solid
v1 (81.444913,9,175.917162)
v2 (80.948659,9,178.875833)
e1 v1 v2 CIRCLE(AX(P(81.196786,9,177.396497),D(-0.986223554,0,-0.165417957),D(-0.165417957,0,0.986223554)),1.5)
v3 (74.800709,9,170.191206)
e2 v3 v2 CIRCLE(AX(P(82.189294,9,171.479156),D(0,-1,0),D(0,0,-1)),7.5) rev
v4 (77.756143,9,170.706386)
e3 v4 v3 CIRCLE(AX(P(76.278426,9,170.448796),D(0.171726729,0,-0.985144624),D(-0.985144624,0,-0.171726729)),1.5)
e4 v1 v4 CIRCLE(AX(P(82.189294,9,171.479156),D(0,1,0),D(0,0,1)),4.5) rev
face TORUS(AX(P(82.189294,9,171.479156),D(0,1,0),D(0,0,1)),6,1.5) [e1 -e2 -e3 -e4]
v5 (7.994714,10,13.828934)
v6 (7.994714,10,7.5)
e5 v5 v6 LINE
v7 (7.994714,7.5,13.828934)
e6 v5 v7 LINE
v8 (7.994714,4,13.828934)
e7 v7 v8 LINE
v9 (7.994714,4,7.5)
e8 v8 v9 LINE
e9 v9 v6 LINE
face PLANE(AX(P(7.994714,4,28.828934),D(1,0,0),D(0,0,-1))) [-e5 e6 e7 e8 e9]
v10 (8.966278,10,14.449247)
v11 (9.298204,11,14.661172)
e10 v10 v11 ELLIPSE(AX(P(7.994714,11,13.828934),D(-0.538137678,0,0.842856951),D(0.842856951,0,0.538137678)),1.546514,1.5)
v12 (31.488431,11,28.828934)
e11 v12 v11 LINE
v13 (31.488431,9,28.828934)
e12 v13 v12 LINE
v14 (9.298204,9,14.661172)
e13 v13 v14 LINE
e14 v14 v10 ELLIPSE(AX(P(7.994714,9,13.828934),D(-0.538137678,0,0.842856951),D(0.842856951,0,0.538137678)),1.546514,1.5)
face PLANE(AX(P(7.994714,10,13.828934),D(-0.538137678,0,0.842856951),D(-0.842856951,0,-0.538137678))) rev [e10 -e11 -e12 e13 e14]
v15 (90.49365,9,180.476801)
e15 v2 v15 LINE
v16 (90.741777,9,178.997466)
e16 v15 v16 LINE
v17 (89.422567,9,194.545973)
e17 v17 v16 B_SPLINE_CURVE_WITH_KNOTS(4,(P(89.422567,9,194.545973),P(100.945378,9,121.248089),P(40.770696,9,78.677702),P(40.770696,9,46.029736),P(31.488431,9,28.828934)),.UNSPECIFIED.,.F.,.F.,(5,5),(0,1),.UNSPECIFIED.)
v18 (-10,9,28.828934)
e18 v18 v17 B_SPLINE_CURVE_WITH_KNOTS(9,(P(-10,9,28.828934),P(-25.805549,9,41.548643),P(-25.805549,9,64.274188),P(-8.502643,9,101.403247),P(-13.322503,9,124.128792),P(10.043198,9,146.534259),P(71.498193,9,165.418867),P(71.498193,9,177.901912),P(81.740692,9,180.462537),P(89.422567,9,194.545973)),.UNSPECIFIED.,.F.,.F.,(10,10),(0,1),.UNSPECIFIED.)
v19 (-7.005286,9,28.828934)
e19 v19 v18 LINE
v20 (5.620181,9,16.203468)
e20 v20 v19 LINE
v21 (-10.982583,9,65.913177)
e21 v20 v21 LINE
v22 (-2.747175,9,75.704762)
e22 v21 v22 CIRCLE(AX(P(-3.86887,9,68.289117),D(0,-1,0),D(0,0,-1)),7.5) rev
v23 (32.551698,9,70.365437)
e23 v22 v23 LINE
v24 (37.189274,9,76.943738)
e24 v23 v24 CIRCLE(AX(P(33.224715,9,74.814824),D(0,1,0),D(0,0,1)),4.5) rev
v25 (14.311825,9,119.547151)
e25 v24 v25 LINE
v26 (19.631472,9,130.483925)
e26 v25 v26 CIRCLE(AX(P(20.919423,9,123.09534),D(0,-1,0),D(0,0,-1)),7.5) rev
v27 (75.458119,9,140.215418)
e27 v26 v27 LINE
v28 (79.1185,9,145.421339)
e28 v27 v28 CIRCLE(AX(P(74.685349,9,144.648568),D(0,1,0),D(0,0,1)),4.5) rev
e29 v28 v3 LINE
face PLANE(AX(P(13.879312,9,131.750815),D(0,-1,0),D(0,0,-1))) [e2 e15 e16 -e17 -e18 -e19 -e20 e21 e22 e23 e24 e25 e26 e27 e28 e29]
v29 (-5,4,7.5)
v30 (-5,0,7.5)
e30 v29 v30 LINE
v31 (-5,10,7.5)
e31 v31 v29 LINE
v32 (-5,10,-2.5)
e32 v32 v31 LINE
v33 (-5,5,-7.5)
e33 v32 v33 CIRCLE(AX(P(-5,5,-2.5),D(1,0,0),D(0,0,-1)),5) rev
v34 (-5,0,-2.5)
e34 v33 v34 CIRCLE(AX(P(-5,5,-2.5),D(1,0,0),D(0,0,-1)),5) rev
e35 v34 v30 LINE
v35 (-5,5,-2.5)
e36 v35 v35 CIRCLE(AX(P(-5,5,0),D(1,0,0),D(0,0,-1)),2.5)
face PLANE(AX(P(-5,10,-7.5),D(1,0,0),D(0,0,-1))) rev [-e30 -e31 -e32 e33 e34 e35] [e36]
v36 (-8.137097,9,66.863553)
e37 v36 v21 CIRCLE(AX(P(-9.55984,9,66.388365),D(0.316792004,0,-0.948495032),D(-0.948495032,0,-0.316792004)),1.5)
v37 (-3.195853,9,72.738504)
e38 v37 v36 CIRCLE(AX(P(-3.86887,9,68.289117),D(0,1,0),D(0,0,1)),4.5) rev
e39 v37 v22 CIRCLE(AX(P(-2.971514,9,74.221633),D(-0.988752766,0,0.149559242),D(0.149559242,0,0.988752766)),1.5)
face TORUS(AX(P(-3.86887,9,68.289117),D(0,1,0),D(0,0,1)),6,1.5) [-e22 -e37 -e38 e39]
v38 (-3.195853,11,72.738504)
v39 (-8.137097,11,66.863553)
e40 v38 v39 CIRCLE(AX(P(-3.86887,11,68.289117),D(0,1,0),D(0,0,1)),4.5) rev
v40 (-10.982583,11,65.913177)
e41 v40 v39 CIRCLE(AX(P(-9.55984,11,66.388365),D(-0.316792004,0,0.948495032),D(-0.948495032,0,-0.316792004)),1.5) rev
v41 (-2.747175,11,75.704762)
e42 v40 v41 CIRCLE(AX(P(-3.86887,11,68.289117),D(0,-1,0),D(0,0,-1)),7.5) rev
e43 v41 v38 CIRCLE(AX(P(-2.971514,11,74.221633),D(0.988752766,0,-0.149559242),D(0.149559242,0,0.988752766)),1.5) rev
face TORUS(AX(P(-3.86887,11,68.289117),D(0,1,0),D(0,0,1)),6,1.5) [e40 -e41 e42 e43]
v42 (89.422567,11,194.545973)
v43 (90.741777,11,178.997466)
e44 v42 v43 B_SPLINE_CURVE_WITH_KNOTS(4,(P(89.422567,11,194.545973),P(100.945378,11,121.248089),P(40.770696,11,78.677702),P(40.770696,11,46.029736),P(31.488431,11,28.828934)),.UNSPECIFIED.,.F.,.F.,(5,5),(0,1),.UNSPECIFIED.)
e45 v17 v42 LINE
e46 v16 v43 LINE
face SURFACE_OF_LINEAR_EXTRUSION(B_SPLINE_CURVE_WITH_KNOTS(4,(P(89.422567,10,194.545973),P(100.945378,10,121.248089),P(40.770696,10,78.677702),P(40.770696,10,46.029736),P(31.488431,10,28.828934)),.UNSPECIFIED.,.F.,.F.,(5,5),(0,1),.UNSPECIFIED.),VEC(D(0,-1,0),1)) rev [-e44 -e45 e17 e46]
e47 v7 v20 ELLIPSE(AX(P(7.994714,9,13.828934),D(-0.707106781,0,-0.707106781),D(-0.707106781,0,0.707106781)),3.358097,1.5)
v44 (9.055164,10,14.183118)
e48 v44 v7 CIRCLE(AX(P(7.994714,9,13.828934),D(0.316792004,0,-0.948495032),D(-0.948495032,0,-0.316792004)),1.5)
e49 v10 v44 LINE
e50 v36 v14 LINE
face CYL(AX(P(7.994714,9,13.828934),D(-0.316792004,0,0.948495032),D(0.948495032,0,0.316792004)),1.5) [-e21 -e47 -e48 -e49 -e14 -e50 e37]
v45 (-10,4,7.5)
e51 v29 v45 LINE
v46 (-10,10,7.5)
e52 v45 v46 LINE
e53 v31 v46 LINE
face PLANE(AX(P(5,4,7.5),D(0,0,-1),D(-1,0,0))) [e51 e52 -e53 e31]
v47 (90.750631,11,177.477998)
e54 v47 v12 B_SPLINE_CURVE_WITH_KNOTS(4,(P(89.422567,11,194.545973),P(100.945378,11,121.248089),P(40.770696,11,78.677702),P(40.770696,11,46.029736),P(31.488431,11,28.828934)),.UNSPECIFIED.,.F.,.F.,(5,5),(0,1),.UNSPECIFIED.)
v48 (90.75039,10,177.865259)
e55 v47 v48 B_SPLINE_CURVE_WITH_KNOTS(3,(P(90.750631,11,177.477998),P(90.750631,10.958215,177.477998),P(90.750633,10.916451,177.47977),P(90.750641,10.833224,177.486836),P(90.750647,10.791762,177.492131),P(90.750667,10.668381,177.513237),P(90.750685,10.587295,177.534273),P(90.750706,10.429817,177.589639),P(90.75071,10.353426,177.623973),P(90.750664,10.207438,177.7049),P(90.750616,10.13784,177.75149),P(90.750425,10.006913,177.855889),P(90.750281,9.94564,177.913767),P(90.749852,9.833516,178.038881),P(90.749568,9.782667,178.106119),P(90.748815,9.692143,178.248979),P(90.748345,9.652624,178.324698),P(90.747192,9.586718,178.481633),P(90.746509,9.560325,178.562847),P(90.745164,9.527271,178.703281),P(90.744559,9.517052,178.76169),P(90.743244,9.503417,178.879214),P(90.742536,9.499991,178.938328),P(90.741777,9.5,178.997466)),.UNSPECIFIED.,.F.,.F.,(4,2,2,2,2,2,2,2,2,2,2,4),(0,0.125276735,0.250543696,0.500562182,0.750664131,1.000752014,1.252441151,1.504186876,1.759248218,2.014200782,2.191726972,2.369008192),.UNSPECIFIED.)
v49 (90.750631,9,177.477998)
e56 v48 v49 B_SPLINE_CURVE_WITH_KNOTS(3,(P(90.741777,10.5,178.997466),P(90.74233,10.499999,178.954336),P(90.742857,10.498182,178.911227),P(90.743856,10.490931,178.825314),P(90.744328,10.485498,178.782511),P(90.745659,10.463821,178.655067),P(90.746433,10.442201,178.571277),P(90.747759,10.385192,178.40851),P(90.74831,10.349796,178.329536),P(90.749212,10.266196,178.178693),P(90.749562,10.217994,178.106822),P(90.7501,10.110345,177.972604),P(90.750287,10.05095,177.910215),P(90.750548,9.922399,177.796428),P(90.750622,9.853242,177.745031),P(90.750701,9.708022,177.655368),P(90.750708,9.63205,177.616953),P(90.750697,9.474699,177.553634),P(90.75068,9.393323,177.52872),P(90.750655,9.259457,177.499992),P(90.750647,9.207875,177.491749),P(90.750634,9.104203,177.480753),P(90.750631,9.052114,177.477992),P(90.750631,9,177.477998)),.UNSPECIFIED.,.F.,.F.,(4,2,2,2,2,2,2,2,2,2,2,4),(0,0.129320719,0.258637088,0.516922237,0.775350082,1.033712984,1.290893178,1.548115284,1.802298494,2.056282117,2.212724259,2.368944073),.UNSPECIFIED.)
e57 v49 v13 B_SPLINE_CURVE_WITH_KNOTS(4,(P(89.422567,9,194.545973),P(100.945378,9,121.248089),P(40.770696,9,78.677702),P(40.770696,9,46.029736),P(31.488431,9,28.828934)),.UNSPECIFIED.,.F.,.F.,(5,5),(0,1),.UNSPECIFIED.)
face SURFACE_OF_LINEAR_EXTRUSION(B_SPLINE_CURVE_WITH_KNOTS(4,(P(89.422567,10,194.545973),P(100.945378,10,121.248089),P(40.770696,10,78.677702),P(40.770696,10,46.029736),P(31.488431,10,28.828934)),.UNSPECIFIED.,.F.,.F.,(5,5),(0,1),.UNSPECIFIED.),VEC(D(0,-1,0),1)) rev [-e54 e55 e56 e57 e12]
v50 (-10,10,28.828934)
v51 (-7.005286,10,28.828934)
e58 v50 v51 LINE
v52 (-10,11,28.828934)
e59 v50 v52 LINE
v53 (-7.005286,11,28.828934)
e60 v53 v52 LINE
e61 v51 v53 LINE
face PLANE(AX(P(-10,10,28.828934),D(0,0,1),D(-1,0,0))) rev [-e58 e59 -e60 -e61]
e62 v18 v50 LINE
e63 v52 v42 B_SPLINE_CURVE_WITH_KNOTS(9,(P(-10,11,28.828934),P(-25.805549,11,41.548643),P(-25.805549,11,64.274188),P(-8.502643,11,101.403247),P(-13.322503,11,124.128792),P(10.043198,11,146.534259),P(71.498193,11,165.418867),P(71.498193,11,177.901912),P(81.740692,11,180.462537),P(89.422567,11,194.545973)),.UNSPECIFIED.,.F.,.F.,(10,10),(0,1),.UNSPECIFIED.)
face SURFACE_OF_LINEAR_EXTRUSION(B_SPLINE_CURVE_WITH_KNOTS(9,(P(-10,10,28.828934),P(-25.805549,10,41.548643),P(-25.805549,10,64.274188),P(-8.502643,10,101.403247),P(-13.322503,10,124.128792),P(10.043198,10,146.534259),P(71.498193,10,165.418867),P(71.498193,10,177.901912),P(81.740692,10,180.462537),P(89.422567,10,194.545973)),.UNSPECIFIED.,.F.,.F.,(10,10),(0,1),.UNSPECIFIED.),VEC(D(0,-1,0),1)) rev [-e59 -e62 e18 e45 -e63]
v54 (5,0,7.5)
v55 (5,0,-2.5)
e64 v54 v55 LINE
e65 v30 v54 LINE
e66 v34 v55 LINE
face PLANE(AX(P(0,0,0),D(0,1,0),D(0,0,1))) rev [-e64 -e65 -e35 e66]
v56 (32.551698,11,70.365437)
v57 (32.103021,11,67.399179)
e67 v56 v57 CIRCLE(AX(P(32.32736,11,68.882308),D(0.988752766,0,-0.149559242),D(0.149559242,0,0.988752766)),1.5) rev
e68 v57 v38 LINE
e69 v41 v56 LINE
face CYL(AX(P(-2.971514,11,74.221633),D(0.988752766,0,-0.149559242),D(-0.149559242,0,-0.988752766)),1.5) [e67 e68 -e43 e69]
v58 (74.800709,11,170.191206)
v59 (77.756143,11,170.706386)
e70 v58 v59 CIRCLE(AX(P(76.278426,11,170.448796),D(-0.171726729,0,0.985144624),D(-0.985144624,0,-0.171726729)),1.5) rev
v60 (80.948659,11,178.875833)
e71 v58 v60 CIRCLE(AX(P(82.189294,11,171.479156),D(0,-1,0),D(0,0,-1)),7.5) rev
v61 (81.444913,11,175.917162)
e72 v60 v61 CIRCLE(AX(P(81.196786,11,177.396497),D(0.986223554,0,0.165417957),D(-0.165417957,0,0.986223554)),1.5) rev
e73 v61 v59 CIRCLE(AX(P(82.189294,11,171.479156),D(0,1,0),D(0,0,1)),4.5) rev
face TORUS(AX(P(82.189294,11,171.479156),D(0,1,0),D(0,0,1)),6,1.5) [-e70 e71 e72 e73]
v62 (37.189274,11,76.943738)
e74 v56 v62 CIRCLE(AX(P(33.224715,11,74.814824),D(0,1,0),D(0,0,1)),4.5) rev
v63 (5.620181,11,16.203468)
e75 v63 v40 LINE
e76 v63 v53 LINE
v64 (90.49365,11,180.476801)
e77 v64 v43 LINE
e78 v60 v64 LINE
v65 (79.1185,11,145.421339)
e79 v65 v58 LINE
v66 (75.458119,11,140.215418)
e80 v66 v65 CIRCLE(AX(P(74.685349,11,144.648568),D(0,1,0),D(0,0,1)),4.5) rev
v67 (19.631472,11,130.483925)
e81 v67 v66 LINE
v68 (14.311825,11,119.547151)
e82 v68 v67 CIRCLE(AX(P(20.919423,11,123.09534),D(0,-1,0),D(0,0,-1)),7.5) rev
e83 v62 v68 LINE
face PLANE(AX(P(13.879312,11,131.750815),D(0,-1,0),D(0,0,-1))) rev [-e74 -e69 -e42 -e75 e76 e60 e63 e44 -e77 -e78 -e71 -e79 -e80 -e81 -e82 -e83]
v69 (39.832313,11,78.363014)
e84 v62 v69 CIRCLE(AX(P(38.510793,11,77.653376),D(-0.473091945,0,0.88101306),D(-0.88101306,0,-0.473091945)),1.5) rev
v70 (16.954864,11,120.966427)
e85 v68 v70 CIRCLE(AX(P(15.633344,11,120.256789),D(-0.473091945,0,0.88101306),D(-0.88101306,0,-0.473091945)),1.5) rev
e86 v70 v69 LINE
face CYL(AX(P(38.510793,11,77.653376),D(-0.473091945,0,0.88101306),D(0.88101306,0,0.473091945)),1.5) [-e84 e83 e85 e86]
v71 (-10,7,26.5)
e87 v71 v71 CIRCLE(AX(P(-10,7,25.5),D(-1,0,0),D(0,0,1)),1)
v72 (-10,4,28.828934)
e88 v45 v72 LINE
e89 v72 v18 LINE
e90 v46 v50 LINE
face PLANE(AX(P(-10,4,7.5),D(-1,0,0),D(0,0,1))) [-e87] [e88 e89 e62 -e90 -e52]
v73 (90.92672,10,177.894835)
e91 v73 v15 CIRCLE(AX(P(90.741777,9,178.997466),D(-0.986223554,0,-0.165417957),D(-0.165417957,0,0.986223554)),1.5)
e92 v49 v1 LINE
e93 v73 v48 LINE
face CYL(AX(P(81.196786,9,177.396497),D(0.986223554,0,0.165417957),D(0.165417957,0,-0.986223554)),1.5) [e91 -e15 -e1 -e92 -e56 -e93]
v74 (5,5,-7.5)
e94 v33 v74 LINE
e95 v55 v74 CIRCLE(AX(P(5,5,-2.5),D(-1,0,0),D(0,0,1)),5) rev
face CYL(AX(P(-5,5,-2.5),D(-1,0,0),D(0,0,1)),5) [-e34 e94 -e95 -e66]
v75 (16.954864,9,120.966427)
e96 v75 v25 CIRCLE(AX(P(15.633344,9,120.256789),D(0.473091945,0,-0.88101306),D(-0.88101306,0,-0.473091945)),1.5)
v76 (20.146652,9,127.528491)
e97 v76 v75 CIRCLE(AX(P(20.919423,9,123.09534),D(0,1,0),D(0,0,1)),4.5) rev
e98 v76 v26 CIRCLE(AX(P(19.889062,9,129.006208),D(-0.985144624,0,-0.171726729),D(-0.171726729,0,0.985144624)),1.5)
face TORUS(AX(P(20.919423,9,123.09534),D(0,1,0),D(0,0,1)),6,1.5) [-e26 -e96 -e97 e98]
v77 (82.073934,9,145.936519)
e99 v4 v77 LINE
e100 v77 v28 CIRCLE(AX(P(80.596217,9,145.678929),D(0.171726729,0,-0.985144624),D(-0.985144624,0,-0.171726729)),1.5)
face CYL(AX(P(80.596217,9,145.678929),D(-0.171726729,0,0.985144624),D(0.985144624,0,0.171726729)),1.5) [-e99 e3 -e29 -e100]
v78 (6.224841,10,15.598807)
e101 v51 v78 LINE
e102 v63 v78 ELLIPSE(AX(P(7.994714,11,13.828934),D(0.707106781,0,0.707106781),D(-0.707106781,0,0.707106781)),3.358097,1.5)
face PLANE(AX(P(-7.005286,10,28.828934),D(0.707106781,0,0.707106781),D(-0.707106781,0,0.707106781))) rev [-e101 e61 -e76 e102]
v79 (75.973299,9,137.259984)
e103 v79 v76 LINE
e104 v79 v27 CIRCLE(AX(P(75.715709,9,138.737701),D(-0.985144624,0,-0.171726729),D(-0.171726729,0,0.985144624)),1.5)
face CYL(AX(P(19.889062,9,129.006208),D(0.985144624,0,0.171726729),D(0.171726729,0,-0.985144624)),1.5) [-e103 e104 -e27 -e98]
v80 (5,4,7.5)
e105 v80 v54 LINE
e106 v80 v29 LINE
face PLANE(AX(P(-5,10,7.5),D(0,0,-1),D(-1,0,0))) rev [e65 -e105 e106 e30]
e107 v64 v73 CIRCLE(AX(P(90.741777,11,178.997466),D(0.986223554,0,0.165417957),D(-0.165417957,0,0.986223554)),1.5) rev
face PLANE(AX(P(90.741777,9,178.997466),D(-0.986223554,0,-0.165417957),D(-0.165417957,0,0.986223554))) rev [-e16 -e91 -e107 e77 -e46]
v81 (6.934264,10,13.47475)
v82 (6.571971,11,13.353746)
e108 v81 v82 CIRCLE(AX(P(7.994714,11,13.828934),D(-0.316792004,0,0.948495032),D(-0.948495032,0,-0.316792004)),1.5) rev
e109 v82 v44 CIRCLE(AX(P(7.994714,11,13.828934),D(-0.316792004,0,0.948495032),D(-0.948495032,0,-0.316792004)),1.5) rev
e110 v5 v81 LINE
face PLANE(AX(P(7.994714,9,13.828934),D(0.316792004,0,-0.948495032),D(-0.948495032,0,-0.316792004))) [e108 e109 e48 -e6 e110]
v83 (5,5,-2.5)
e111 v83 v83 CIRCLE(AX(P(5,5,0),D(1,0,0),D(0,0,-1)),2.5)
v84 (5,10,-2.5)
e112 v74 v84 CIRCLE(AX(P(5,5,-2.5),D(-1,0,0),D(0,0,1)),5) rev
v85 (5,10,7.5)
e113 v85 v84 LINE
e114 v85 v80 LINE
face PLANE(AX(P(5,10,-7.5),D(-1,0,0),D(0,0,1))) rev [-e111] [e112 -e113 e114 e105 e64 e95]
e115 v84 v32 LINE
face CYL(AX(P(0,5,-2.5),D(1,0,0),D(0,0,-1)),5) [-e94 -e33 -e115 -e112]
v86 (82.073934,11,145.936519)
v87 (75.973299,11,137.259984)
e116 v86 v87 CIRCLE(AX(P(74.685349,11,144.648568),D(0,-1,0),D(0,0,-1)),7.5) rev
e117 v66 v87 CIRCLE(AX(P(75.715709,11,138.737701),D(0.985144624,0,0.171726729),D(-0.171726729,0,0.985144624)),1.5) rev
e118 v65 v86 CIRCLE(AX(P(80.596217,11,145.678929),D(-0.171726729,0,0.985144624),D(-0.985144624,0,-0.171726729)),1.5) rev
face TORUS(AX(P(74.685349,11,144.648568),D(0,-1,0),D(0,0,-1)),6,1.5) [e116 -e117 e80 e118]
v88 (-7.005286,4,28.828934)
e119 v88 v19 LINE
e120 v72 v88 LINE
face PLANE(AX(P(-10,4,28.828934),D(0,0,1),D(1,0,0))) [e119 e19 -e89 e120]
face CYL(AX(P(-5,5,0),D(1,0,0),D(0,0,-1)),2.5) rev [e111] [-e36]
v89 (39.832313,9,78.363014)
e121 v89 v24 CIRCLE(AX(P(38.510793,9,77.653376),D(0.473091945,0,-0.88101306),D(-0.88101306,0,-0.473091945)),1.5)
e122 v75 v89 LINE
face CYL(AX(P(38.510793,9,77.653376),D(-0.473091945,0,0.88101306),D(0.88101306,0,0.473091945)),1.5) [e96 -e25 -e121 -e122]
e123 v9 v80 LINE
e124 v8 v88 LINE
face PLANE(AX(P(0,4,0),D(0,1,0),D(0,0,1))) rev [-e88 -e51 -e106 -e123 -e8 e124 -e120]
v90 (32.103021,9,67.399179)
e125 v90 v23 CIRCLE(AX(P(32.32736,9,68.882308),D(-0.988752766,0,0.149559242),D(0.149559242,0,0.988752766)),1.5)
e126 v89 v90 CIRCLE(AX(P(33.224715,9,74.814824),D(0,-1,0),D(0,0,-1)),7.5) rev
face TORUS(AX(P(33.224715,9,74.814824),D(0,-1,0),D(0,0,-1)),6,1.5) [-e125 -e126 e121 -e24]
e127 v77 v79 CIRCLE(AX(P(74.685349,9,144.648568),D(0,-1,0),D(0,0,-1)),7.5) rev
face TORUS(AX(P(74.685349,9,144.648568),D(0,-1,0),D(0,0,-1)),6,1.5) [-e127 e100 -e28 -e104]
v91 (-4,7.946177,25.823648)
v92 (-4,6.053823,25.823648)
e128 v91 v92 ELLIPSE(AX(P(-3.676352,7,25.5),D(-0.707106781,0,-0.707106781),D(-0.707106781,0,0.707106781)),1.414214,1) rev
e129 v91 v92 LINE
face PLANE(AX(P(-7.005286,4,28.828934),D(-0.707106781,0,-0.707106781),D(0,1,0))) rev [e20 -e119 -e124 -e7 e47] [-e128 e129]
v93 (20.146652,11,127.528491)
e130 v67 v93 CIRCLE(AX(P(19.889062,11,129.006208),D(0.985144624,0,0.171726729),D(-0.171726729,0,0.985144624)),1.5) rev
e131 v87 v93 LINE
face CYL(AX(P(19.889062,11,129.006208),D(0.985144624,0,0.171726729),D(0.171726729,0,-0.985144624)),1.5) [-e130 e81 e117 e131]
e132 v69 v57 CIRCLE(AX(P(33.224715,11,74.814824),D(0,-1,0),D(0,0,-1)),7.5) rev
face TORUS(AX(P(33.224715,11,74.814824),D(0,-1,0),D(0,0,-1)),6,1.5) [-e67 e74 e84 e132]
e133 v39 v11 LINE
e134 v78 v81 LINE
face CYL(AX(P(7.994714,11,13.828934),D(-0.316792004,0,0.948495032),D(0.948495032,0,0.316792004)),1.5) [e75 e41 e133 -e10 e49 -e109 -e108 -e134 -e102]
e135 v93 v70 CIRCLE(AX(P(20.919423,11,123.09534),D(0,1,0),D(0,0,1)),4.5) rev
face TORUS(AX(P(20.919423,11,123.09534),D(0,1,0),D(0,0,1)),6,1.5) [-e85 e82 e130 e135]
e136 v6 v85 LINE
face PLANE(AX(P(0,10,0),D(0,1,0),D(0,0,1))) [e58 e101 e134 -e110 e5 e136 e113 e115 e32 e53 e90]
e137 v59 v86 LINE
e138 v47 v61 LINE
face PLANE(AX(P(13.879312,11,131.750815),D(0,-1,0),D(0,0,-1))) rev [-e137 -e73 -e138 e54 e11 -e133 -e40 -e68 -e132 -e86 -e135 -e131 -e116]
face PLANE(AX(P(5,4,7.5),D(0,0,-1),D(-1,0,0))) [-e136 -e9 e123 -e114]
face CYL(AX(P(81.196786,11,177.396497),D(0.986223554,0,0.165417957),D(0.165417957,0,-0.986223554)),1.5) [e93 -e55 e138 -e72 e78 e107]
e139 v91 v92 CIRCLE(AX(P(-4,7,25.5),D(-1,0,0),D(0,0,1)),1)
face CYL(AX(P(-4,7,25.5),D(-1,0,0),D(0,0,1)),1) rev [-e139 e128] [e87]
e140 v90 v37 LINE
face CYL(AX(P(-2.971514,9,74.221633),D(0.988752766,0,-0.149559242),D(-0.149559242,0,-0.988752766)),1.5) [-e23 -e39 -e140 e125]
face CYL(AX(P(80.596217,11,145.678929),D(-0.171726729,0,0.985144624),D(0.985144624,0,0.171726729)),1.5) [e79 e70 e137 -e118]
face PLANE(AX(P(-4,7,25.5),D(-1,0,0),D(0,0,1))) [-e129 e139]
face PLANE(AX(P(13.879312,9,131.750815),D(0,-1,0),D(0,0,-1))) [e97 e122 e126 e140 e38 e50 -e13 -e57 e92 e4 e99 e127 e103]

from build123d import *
from build123d.topology import SkipClean

# Parameters (mm, degrees)
SKETCH1_W           = 10
SKETCH1_H           = 15
BOSS_EXTRUDE1_DEPTH = 10
SKETCH2_R           = 2.5
CUT_EXTRUDE1_DEPTH  = 10
FILLET1_R           = 5
BOSS_EXTRUDE2_DEPTH = 6
CHAMFER1_SIZE       = 15
THICKEN2_START      = 9
THICKEN2_DEPTH      = 2
SWEEP1_PROFILE_R    = 1.5
SKETCH30_R          = 1
CUT_EXTRUDE2_DEPTH  = 6


# Read off the part's stored shape, not the designer's step: Thicken2
with BuildPart() as part:
    # Sketch1 → Boss-Extrude1 (new body)
    with BuildSketch(Plane(origin=(0, 0, 0), x_dir=(1, 0, 0), z_dir=(0, 1, 0))):
        Rectangle(SKETCH1_W, SKETCH1_H)
    extrude(amount=BOSS_EXTRUDE1_DEPTH)

    # Sketch2 → Cut-Extrude1 (cut)
    with BuildSketch(Plane(origin=(5, 0, 0), x_dir=(0, 0, -1), z_dir=(1, 0, 0))):
        with Locations((0, 5)):
            Circle(SKETCH2_R)
    extrude(amount=-CUT_EXTRUDE1_DEPTH, mode=Mode.SUBTRACT)

    # Fillet1
    fillet1_edges = [part.edges().sort_by_distance(p)[0] for p in [
        (0, 0, -7.5),
        (0, 10, -7.5),
    ]]
    fillet(fillet1_edges, radius=FILLET1_R - 0.0001)  # a hair under: the kernel refuses the full size

    # Sketch3 → Boss-Extrude2 (add)
    with BuildSketch(Plane(origin=(0, 10, 0), x_dir=(1, 0, 0), z_dir=(0, 1, 0))):
        Polygon((-5, -7.5), (-10, -7.5), (-10, -28.828934271), (7.994714039, -28.828934271), (7.994714039, -7.5), (5, -7.5), (0, -7.5), align=None)
    extrude(amount=-BOSS_EXTRUDE2_DEPTH)

    # Chamfer1
    chamfer1_edges = [part.edges().sort_by_distance(p)[0] for p in [
        (7.994714039, 7, 28.828934271),
    ]]
    chamfer(chamfer1_edges, length=CHAMFER1_SIZE)

    # Thicken2 outline → Thicken2 (add)
    with BuildSketch(Plane(origin=(0, 0, 0), x_dir=(1, 0, 0), z_dir=(0, 1, 0)).offset(THICKEN2_START)):
        with BuildLine():
            Line((-7.005285961, -28.828934271), (-10, -28.828934271))
            add(Edge.make_bspline(
                [(-10, -28.828934271), (-25.805548542, -41.548642671), (-25.805548542, -64.274187613), (-8.502642981, -101.403246954), (-13.322502729, -124.128791895), (10.043198408, -146.534258739), (71.49819318, -165.418866507), (71.49819318, -177.90191232), (81.740692308, -180.462537103), (89.422566655, -194.545973404)],
                knots=[0, 0, 0, 0, 0, 0, 0, 0, 0, 0, 1, 1, 1, 1, 1, 1, 1, 1, 1, 1], degree=9))
            add(Edge.make_bspline(
                [(89.422566655, -194.545973404), (100.945378174, -121.248089016), (40.770695794, -78.677702012), (40.770695794, -46.02973604), (31.488430959, -28.828934271)],
                knots=[0, 0, 0, 0, 0, 1, 1, 1, 1, 1], degree=4))
            Line((31.488430959, -28.828934271), (7.994714039, -13.828934271))
            Line((7.994714039, -13.828934271), (-7.005285961, -28.828934271))
        make_face()
    extrude(amount=THICKEN2_DEPTH)

    # Sweep1: sweep along a path in Sketch5
    with BuildLine(Plane.XZ.offset(-9)) as sweep1_path:
        Line((7.994714039, 13.828934271), (-9.559839963, 66.388364513))
        ThreePointArc((-9.559839963, 66.388364513), (-8.460678772, 72.151148401), (-2.971514318, 74.221633139))
        Line((-2.971514318, 74.221633139), (32.327359535, 68.882307682))
        ThreePointArc((32.327359535, 68.882307682), (38.128604445, 71.357676876), (38.510793347, 77.653375948))
        Line((38.510793347, 77.653375948), (15.633344245, 120.256788816))
        ThreePointArc((15.633344245, 120.256788816), (15.523828609, 125.719757641), (19.889062234, 129.006208229))
        Line((19.889062234, 129.006208229), (75.715709234, 138.737700667))
        ThreePointArc((75.715709234, 138.737700667), (79.593538333, 141.197528553), (80.596216607, 145.678928785))
        Line((80.596216607, 145.678928785), (76.278425981, 170.448795755))
        ThreePointArc((76.278425981, 170.448795755), (77.292173347, 174.94588542), (81.196785983, 177.396497454))
        Line((81.196785983, 177.396497454), (90.741777338, 178.997466082))
    # Sweep1 profile (on start of the path) → Sweep1 (sweep)
    with BuildSketch(Plane(origin=(7.994714039, 9, 13.828934271), x_dir=(0.9484950320892925, 0, 0.31679200447917233), z_dir=(-0.31679200447917233, 0, 0.9484950320892925))):
        Circle(SWEEP1_PROFILE_R)
    sweep1 = sweep(path=sweep1_path.line)

    # Mirror1: Sweep1 across plane
    with SkipClean():  # the faces are left unmerged after this step: merging them gives an invalid solid
        add(sweep1.mirror(Plane.ZX.offset(10)))

    # Sketch30 → Cut-Extrude2 (cut)
    with SkipClean():  # the faces are left unmerged after this step: merging them gives an invalid solid
        with BuildSketch(Plane.ZY.offset(10)):
            with Locations((25.5, 7)):
                Circle(SKETCH30_R)
        extrude(amount=-CUT_EXTRUDE2_DEPTH, mode=Mode.SUBTRACT)


solid = part.part
